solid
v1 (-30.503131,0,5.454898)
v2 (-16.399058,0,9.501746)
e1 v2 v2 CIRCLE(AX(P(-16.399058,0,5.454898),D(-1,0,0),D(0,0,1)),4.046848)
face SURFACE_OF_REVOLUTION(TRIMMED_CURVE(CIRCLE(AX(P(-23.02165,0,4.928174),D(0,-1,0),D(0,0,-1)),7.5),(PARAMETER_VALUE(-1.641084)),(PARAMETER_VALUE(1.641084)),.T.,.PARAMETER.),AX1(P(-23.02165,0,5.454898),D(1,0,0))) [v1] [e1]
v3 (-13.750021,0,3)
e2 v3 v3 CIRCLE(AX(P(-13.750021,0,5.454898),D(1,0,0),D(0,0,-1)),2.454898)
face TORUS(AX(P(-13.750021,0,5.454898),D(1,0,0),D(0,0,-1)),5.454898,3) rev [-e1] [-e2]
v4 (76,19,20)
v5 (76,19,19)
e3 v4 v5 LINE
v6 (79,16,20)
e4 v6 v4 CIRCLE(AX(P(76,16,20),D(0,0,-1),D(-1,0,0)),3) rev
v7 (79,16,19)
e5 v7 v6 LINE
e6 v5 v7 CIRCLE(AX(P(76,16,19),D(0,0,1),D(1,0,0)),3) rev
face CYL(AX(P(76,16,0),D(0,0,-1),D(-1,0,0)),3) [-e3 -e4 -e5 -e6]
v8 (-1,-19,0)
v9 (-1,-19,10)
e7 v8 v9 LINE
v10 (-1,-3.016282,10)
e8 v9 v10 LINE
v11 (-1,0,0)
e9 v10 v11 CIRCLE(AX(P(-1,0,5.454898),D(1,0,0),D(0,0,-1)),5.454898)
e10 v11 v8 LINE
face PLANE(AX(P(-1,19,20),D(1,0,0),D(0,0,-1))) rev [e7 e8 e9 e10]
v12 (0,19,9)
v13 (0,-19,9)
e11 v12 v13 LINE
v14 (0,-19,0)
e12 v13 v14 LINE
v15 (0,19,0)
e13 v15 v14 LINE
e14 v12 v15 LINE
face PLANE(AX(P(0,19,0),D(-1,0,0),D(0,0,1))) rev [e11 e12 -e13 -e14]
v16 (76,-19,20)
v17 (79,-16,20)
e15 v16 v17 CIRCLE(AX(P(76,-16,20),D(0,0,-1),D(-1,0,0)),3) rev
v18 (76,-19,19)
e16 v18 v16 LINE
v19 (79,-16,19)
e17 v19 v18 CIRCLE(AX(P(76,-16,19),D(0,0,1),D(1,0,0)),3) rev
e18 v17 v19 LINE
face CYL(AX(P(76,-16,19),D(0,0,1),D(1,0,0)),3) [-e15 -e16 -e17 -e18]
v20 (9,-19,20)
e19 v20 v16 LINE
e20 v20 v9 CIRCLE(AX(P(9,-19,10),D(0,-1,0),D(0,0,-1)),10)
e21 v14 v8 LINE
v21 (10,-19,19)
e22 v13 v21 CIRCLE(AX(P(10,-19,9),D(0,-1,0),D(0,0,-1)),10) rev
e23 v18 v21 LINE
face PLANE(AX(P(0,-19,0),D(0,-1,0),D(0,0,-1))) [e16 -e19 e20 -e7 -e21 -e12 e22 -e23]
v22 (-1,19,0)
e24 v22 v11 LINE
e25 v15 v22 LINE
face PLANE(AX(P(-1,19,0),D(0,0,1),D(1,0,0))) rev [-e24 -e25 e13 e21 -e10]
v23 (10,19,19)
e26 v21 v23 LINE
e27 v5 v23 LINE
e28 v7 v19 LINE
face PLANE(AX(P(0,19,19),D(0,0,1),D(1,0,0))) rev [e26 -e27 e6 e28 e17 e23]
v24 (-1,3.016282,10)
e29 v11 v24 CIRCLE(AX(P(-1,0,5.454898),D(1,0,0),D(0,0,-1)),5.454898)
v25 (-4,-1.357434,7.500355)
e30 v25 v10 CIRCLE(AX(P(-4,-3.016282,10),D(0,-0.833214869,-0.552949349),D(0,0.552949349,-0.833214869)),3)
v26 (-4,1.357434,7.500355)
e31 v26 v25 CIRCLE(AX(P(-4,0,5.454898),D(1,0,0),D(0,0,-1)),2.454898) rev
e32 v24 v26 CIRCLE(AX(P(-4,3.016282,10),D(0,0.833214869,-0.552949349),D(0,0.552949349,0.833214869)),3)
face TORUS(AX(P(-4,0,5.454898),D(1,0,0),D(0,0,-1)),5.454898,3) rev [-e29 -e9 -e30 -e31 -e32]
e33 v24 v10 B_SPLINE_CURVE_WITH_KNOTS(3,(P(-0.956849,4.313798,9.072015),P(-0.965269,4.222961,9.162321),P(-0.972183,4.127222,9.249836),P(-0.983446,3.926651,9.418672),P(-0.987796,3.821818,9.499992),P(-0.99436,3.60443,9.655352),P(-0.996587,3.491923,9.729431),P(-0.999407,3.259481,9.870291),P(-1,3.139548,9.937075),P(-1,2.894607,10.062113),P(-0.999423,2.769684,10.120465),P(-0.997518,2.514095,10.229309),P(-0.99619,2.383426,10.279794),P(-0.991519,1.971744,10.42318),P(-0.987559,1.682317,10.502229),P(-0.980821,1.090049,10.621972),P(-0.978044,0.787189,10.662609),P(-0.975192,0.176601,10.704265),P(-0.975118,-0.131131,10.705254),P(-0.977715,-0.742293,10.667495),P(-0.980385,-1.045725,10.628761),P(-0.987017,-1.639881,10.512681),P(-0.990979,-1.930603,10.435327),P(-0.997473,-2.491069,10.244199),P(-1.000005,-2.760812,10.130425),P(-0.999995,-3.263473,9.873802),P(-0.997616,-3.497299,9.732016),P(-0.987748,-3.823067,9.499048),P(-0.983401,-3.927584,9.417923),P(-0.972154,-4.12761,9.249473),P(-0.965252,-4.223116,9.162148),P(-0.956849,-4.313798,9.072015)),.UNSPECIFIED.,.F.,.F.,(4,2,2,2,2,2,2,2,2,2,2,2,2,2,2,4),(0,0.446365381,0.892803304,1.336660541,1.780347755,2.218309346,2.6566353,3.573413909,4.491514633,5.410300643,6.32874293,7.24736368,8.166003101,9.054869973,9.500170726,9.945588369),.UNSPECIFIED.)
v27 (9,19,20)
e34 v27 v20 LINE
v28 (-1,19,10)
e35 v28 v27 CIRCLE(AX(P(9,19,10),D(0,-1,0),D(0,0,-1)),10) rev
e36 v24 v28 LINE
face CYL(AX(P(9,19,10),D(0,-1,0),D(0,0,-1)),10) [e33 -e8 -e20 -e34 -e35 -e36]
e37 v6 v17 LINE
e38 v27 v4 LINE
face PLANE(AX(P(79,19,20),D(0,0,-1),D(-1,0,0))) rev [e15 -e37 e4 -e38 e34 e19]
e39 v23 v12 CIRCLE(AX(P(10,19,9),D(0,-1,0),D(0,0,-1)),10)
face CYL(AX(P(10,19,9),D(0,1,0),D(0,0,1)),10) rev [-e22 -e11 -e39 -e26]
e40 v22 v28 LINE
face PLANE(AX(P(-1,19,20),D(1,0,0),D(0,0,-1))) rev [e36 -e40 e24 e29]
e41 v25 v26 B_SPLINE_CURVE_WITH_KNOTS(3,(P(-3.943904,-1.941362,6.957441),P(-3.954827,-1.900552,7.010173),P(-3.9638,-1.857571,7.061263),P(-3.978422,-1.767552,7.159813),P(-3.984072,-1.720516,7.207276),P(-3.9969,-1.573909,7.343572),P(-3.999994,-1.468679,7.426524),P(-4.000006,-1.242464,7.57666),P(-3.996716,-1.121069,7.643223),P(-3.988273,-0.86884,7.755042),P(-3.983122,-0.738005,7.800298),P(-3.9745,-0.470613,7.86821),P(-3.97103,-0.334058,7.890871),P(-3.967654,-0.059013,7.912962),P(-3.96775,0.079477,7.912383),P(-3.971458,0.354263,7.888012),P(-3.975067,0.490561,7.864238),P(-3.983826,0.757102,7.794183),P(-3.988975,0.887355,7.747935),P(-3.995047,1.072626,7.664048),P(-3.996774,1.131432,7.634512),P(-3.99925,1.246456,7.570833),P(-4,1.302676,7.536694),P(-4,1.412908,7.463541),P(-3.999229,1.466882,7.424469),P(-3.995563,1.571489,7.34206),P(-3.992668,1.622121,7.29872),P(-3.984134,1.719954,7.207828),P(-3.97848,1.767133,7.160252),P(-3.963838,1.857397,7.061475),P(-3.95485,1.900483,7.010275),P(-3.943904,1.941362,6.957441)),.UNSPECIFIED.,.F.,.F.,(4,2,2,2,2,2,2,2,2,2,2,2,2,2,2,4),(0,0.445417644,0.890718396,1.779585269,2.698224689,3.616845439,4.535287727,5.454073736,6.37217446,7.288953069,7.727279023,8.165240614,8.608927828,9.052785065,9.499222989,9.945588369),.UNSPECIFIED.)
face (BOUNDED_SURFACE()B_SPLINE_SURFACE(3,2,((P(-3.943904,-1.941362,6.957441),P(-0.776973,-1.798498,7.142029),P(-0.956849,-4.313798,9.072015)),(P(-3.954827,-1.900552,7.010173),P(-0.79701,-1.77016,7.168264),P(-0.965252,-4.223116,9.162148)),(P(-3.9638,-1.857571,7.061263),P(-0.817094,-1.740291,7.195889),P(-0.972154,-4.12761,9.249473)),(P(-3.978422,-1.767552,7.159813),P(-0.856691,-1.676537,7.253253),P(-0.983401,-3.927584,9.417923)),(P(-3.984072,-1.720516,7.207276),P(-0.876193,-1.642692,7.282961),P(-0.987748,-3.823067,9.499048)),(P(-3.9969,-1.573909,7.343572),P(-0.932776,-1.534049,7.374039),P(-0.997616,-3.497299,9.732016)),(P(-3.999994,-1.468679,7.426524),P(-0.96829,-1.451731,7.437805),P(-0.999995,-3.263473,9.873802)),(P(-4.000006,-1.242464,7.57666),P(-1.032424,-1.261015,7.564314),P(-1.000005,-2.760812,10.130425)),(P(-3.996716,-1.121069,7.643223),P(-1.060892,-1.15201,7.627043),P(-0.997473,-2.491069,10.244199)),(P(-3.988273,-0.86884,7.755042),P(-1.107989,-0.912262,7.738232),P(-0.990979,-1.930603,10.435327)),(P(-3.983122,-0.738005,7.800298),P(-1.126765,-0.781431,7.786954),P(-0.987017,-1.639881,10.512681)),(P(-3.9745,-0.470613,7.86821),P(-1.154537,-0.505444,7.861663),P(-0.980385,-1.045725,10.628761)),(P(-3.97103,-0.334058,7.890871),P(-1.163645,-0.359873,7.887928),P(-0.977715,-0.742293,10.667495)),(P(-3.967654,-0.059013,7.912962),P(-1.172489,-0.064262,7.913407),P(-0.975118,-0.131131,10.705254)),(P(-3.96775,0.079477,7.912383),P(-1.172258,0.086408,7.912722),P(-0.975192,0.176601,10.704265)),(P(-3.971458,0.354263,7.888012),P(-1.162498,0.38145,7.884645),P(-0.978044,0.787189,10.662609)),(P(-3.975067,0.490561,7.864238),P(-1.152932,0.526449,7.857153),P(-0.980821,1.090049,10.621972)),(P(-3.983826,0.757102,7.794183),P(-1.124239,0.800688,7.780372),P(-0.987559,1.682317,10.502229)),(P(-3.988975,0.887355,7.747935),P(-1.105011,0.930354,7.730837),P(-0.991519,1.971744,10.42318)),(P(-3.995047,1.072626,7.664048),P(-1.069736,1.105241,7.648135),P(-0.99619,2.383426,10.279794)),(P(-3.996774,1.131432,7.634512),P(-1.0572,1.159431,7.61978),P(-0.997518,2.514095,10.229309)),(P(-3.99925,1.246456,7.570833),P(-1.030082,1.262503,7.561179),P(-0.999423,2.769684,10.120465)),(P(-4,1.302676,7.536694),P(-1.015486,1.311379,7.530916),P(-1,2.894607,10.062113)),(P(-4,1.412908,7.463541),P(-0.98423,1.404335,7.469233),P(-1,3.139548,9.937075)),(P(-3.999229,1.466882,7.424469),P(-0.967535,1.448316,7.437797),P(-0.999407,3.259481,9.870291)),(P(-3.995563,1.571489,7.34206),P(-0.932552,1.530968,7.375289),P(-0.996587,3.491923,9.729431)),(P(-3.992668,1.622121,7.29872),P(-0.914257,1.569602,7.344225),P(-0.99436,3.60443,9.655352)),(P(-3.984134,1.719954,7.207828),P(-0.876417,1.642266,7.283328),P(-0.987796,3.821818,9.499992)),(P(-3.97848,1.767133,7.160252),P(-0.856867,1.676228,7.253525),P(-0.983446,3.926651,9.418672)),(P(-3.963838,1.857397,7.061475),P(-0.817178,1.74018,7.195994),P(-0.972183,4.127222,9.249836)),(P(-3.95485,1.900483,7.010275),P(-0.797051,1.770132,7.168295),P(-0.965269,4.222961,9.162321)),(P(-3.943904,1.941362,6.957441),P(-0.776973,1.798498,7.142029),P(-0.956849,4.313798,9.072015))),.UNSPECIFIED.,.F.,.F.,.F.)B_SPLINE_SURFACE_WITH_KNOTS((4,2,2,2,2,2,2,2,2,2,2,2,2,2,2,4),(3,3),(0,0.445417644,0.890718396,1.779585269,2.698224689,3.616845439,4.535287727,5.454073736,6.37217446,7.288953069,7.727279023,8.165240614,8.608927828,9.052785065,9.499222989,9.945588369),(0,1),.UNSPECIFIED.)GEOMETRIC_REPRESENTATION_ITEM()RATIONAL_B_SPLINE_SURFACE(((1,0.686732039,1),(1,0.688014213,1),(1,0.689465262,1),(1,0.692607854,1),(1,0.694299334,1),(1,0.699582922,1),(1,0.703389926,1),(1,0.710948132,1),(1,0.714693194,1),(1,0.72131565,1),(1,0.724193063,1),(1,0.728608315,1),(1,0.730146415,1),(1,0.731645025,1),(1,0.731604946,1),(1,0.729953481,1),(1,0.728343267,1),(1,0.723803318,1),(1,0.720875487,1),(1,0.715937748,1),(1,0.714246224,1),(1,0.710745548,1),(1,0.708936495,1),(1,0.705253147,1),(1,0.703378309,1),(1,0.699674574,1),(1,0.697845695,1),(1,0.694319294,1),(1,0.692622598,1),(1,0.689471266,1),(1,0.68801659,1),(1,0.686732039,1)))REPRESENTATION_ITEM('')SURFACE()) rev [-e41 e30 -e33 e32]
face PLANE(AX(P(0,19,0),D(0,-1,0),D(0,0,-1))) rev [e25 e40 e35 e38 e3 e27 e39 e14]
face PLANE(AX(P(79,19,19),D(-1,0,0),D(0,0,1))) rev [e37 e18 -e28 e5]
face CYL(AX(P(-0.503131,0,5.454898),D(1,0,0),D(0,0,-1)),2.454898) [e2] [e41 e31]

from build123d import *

# Parameters (mm, degrees)
BOSS_EXTRUDE1_DEPTH = 19
FILLET1_R           = 3
FILLET2_R           = 10
FILLET3_R           = 3


with BuildPart() as part:
    # Sketch1 → Boss-Extrude1 (new, symmetric)
    with BuildSketch(Plane(origin=(0, 0, 0), x_dir=(1, 0, 0), z_dir=(0, 1, 0))):
        Polygon((0, 0), (0, -19), (79, -19), (79, -20), (-1, -20), (-1, 0), align=None)
    extrude(amount=BOSS_EXTRUDE1_DEPTH, both=True)

    # Fillet1
    fillet1_edges = [part.edges().sort_by_distance(p)[0] for p in [
        (79, 19, 19.5),
        (79, -19, 19.5),
    ]]
    fillet(fillet1_edges, radius=FILLET1_R)

    # Fillet2
    fillet2_edges = [part.edges().sort_by_distance(p)[0] for p in [
        (0, 0, 19),
        (-1, 0, 20),
    ]]
    fillet(fillet2_edges, radius=FILLET2_R)

    # Sketch2 → Revolve2 (revolve)
    with BuildSketch(Plane(origin=(0, 0, 0), x_dir=(1, 0, 0), z_dir=(0, 1, 0))):
        with BuildLine():
            Line((-0.773743612, -3), (-15.773743612, -3))
            ThreePointArc((-15.773743612, -3), (-24.25464239, 2.469780889), (-30.503131217, -5.454897934))
            Line((-30.503131217, -5.454897934), (-0.503131217, -5.454897934))
            Line((-0.503131217, -5.454897934), (-0.773743612, -3))
        make_face()
    revolve(axis=Axis((-0.503131217, 0, 5.454897934), (-1, 0, 0)))

    # Fillet3
    fillet3_edges = [part.edges().sort_by_distance(p)[0] for p in [
        (-15.773743612, 0, 7.909795868),
        (-1, 0, 7.909795868),
    ]]
    fillet(fillet3_edges, radius=FILLET3_R - 0.0001)  # a hair under: the kernel refuses the full size


solid = part.part
